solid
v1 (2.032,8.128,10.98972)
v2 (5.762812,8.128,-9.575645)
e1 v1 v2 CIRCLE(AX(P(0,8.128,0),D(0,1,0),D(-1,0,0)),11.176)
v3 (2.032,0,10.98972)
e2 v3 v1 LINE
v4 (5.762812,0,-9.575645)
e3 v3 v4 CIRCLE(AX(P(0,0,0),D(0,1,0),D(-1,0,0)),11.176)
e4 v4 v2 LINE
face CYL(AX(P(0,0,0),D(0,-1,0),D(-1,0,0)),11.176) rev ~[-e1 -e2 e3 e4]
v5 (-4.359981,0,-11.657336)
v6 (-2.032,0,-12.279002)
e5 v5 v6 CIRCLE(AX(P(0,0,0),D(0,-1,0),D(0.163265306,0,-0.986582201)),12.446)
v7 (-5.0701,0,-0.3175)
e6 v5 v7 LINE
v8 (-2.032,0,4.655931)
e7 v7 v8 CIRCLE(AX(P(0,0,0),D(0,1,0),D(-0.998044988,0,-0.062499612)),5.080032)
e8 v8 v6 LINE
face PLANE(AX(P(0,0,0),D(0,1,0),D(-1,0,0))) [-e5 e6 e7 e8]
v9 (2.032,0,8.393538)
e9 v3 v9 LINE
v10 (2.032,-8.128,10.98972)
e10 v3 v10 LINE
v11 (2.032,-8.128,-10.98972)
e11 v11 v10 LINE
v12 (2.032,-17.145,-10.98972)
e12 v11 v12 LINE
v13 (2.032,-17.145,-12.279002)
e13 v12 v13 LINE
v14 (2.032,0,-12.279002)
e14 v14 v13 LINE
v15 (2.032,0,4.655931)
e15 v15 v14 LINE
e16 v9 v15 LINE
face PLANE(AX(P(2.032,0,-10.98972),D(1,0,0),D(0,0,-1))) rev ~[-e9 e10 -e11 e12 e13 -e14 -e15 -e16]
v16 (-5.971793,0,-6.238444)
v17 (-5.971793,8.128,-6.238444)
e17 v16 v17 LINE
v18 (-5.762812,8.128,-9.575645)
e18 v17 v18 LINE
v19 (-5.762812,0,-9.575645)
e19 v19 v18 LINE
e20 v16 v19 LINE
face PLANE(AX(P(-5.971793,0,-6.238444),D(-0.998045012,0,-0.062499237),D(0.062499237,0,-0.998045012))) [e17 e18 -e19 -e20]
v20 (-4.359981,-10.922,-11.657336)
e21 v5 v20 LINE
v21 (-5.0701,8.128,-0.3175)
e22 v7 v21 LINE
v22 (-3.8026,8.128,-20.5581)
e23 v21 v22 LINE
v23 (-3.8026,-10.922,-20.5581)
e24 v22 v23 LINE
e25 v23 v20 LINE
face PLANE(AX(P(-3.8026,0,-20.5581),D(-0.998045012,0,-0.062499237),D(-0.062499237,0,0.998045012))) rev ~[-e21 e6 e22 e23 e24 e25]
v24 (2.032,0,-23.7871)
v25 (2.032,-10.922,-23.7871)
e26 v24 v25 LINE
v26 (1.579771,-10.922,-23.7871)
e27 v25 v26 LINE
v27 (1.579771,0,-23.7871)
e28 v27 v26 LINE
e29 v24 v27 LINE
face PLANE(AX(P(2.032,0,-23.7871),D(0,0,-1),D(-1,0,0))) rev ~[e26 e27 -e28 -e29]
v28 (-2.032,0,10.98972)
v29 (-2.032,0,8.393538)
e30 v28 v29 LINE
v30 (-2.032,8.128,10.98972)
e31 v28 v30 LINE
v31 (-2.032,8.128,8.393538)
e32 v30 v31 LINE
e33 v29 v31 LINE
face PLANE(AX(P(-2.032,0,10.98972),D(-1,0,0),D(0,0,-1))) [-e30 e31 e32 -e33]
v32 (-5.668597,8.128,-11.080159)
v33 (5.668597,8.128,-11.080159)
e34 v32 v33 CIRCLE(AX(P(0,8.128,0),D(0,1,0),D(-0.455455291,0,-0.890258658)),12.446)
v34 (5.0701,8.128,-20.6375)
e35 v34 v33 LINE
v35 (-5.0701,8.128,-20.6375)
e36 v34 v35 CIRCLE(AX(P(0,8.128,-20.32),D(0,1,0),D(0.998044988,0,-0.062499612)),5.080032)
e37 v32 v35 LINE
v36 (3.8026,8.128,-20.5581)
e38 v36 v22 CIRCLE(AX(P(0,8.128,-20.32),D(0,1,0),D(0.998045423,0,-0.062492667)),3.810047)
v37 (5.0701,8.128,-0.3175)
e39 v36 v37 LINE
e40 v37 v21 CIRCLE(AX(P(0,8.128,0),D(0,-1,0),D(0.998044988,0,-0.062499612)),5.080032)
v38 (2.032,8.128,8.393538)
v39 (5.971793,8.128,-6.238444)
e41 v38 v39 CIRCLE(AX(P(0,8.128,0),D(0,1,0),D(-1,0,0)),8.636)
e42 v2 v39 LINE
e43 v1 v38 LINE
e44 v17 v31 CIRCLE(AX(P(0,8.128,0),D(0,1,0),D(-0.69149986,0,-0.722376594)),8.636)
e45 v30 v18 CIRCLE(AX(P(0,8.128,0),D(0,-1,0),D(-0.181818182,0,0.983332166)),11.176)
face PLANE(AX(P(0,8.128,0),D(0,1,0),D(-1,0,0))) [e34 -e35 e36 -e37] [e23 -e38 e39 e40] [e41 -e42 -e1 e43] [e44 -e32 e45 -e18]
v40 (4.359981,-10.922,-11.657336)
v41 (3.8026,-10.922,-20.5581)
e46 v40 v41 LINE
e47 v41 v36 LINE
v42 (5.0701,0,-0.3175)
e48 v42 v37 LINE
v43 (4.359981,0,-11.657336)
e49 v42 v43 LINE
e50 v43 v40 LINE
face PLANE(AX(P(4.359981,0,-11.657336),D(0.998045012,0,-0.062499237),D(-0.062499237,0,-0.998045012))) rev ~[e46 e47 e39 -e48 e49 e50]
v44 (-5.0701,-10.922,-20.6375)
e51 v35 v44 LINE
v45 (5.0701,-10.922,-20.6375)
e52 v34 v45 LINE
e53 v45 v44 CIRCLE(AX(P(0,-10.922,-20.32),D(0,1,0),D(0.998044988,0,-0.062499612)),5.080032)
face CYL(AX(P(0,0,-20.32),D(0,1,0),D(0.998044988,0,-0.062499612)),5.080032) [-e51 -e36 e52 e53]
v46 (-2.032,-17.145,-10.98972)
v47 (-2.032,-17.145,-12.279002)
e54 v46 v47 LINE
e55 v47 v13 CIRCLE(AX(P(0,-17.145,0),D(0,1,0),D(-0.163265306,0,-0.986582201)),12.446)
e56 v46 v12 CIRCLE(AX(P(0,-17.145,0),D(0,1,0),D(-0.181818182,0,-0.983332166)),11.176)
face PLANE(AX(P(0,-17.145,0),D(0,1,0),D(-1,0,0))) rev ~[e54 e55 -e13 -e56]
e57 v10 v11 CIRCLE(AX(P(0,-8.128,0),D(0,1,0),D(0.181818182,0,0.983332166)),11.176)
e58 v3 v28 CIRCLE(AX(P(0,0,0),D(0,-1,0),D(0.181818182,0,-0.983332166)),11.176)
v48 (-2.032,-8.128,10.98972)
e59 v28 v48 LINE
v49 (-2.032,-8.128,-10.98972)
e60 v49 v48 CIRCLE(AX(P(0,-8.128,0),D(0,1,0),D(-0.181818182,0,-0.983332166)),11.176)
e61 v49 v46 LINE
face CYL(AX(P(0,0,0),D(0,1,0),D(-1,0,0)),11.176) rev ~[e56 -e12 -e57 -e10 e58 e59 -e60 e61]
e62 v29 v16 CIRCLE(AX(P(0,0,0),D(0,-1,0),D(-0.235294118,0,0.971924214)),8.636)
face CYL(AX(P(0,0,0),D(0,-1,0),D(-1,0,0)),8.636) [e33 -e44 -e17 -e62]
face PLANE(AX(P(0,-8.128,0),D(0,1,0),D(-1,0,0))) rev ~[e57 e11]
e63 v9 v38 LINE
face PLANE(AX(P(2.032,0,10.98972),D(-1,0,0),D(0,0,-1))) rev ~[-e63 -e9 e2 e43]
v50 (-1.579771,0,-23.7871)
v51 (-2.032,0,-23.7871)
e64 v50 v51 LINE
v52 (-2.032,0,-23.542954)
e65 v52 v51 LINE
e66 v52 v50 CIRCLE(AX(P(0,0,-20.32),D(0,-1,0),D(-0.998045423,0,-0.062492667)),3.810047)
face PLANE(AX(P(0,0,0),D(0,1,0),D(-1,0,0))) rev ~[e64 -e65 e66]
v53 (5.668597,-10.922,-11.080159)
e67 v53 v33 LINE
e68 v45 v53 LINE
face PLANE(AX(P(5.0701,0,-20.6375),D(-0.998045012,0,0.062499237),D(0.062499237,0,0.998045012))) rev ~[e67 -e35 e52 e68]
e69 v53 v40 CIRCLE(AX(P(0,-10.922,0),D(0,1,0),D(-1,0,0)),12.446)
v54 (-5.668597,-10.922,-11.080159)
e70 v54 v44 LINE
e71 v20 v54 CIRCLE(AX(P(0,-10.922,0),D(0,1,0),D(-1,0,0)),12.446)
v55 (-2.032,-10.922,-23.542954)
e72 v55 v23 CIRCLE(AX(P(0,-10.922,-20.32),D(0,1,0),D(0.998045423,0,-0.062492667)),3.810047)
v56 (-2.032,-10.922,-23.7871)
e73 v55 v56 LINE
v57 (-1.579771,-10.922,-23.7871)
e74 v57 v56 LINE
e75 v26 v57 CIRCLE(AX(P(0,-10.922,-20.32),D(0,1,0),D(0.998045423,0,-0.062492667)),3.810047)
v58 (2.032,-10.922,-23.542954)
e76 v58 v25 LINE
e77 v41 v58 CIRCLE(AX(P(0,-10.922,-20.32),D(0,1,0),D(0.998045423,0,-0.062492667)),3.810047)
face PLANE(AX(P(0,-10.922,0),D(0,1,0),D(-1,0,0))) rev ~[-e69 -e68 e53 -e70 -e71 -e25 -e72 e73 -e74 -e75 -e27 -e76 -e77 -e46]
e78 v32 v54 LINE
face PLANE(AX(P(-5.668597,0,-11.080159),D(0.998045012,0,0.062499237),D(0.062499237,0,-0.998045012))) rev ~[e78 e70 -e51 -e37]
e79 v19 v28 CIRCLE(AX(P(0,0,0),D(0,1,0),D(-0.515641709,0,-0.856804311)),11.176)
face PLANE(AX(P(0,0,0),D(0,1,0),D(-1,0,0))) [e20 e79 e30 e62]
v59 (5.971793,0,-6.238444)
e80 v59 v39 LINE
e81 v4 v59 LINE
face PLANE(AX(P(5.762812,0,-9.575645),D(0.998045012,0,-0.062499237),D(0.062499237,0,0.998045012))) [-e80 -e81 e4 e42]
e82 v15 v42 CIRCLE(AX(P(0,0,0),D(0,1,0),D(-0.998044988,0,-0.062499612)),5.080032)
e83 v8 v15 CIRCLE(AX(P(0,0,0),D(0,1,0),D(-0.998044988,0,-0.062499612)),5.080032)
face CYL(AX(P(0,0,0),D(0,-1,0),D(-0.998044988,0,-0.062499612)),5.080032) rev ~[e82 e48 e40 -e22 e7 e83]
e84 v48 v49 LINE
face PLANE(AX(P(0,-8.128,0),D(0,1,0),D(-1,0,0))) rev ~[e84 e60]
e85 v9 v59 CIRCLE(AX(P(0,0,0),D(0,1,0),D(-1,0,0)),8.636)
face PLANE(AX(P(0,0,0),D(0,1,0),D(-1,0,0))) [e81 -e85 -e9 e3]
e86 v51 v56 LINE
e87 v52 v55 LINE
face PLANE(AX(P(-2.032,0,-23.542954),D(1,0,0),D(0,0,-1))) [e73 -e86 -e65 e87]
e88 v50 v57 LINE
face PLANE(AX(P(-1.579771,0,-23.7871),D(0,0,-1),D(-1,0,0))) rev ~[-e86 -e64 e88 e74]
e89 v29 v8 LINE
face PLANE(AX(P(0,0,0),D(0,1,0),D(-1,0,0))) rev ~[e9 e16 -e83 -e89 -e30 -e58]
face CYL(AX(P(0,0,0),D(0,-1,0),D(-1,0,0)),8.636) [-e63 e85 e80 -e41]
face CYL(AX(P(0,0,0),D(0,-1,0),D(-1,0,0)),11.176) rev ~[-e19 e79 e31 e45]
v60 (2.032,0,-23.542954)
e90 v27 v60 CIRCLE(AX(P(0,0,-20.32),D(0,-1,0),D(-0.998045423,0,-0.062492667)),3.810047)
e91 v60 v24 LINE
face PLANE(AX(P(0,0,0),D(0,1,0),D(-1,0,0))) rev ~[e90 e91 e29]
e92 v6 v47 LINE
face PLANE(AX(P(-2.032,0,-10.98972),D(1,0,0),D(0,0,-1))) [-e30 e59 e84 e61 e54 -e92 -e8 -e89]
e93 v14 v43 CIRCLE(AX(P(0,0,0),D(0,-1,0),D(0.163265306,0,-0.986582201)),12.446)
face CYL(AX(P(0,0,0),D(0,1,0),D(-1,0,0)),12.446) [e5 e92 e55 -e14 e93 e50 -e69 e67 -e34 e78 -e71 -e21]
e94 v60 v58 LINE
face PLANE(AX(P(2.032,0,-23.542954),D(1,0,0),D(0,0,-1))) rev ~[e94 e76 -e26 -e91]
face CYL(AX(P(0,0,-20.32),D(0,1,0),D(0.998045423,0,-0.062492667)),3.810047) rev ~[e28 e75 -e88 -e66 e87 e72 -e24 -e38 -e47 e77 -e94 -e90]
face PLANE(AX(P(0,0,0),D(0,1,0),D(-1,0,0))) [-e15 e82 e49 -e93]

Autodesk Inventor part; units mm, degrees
ref_plane "YZ Plane" through (0, 0, 0) normal (1, 0, 0) x (0, 1, 0)
ref_plane "XZ Plane" through (0, 0, 0) normal (0, 1, 0) x (-1, 0, 0)
ref_plane "XY Plane" through (0, 0, 0) normal (0, 0, 1) x (1, 0, 0)
sketch "Valve Handle" plane through (0, 0, 0) normal (0, 0, 1) x (1, 0, 0)
  line L0 (-2.032, 23.7871) -> (2.032, 23.7871)
  line L1 (-2.032, -23.7871) -> (2.032, -23.7871)
  line L2 (-2.032, 23.7871) -> (-2.032, -23.7871)
  line L3 (2.032, 23.7871) -> (2.032, -23.7871)
  line L4 (0, 11.176) -> (0, -22.606)
  line L5 (0, 11.176) -> (0, -22.606)
  point P0 (0, -1.7145)
  point P1 (0, 0)
  dimension "d146" = 33.782
  dimension "d167" = 11.176
  dimension "d168" = 22.606
sketch "Valve Casing" plane through (0, 0, 0) normal (0, 0, 1) x (1, 0, 0)
  circle A0 centre (0, 0) radius 8.636
  circle A1 centre (0, 0) radius 11.176
  circle A2 centre (0, 0) radius 12.446
  dimension "d149" = 24.892
sketch "Servo Arm Socket" plane through (0, 0, 0) normal (0, 0, 1) x (1, 0, 0)
  arc A0 (4.8166, -0.3016) -> (-4.8166, -0.3016) centre (0, 0) ccw
  line L0 (0, 0) -> (0, -20.32)
  arc A1 (-3.549, -20.5423) -> (3.549, -20.5423) centre (0, -20.32) ccw
  line L1 (-3.549, -20.5423) -> (-4.8166, -0.3016)
  line L2 (4.8166, -0.3016) -> (3.549, -20.5423)
  line L3 (-5.0701, -0.3175) -> (-3.8026, -20.5581)
  arc A2 (-3.8026, -20.5581) -> (3.8026, -20.5581) centre (0, -20.32) ccw
  line L4 (3.8026, -20.5581) -> (5.0701, -0.3175)
  arc A3 (5.0701, -0.3175) -> (-5.0701, -0.3175) centre (0, 0) ccw
  line L5 (-5.0701, -20.6375) -> (-6.3376, -0.3969)
  arc A4 (6.3376, -0.3969) -> (-6.3376, -0.3969) centre (0, 0) ccw
  line L6 (6.3376, -0.3969) -> (5.0701, -20.6375)
  arc A5 (-5.0701, -20.6375) -> (5.0701, -20.6375) centre (0, -20.32) ccw
  dimension "d162" = 9.652
  dimension "d163" = 20.32
  dimension "d164" = 7.112
  dimension "d165" = 0.254
  dimension "d166" = 1.27
sketch "Sketch10" plane through (0, 0, 0) normal (0, 1, 0) x (-1, 0, 0)
  line L0 (0, -14.097) -> (0, 0)
  line L1 (0, 23.7871) -> (0, -23.7871) construction
  line L2 (-2.032, 23.7871) -> (2.032, 23.7871)
  line L3 (-2.032, -23.7871) -> (2.032, -23.7871)
  line L4 (-2.032, 23.7871) -> (-2.032, -23.7871)
  line L5 (2.032, 23.7871) -> (2.032, -23.7871)
  line L6 (0, 11.176) -> (0, -22.606)
  line L7 (0, 11.176) -> (0, -22.606)
  circle A0 centre (0, 0) radius 8.636
  circle A1 centre (0, 0) radius 11.176
  circle A2 centre (0, 0) radius 12.446
  arc A3 (4.8166, -0.3016) -> (-4.8166, -0.3016) centre (0, 0) ccw
  line L8 (0, 0) -> (0, -20.32)
  arc A4 (-3.549, -20.5423) -> (3.549, -20.5423) centre (0, -20.32) ccw
  line L9 (-3.549, -20.5423) -> (-4.8166, -0.3016)
  line L10 (4.8166, -0.3016) -> (3.549, -20.5423)
  line L11 (-5.0701, -0.3175) -> (-3.8026, -20.5581)
  arc A5 (-3.8026, -20.5581) -> (3.8026, -20.5581) centre (0, -20.32) ccw
  line L12 (3.8026, -20.5581) -> (5.0701, -0.3175)
  arc A6 (5.0701, -0.3175) -> (-5.0701, -0.3175) centre (0, 0) ccw
  line L13 (-5.0701, -20.6375) -> (-6.3376, -0.3969)
  arc A7 (6.3376, -0.3969) -> (-6.3376, -0.3969) centre (0, 0) ccw
  line L14 (6.3376, -0.3969) -> (5.0701, -20.6375)
  arc A8 (-5.0701, -20.6375) -> (5.0701, -20.6375) centre (0, -20.32) ccw
  point P0 (2.032, -10.9897)
  point P1 (2.032, -12.279)
  point P2 (-2.032, -12.279)
  point P3 (-2.032, -10.9897)
  point P4 (-2.032, 10.9897)
  point P5 (2.032, 10.9897)
  point P6 (-6.1771, -11.0965)
  point P7 (6.1771, -11.0965)
  point P8 (6.4453, -9.1302)
  point P9 (7.0009, -5.0565)
  point P10 (2.032, 8.3935)
  point P11 (-2.032, 8.3935)
  point P12 (-7.0009, -5.0565)
  point P13 (6.1771, -11.0965)
  point P14 (-6.1771, -11.0965)
  point P15 (2.032, 7.3441)
  point P16 (-7.0009, -5.0565)
  point P17 (7.0009, -5.0565)
  point P18 (6.4453, -9.1302)
  point P19 (2.032, -19.4386)
  point P20 (-6.4453, -9.1302)
  point P21 (2.032, -8.3935)
  point P22 (-2.032, 7.3441)
  point P23 (-2.032, -19.4386)
  point P24 (-2.032, -8.3935)
  point P25 (-5.6686, -11.0802)
  point P26 (5.6686, -11.0802)
  point P27 (5.9718, -6.2385)
  point P28 (-5.9718, -6.2385)
  point P29 (5.7628, -9.5757)
  point P30 (-5.7628, -9.5757)
  point P31 (4.3599, -11.6574)
  point P32 (2.032, -23.5429)
  point P33 (1.5797, -23.7871)
  point P34 (-1.5797, -23.7871)
  point P35 (-2.032, -23.5429)
  point P36 (-4.3599, -11.6574)
extrude "Extrusion21" add sketch "Sketch10" against normal blind 17.145 contours A2 L9 A1 L4 | L5 A1 L10 A2 | A2 L11 A1 L9 | L10 A1 L12 A2 | A2 L13 A1 L11 | L12 A1 L14 A2 | A2 L4 A1 L13 | L14 A1 L5 A2 | A2 L5 A1 L4
extrude "Extrusion22" add sketch "Sketch10" against normal blind 8.128 contours A1 L9 A0 L4 | L5 A0 L10 A1 | A0 L9 A3 L4 | L5 A3 L10 A0 | A1 L11 A0 L9 | L10 A0 L12 A1 | A3 L9 A0 L11 A6 L4 | L5 A6 L12 A0 L10 A3 | A1 L13 A0 L11 | L12 A0 L14 A1 | A6 L11 A0 L13 A7 L4 | L5 A7 L14 A0 L12 A6 | A1 L4 A0 L13 | L14 A0 L5 A1 | A7 L13 A0 L4 | L5 A0 L14 A7
extrude "Extrusion25" add sketch "Sketch10" along normal blind 8.128 contours A5 L3 L4 | L4 L3 A5 L5 L12 A2 L14 A8 L13 L11 | A2 L13 A1 L11 | L5 L3 A5 | L12 A1 L14 A2 | A1 L13 A0 L11 | L12 A0 L14 A1 | A2 L4 A1 L13 | L14 A1 L5 A2 | A6 L4 A7 L6 | L6 A7 L5 A6 | A6 L11 A0 L13 A7 L4 | L5 A7 L14 A0 L12 A6 | A2 L5 A1 L4 | A7 L4 A0 L6 | L6 A0 L5 A7 | A7 L13 A0 L4 | L5 A0 L14 A7 | A1 L6 A0 L4 | L6 A1 L5 A0
sketch "Sketch11" plane through (0, 0, 0) normal (0, 0, 1) x (1, 0, 0)
  point P0 (0, 0)
extrude "Extrusion27" add sketch "Sketch10" against normal blind 10.922 contours L4 L3 A5 L5 L12 A2 L14 A8 L13 L11
properties part number "Servo Adapter 4"
